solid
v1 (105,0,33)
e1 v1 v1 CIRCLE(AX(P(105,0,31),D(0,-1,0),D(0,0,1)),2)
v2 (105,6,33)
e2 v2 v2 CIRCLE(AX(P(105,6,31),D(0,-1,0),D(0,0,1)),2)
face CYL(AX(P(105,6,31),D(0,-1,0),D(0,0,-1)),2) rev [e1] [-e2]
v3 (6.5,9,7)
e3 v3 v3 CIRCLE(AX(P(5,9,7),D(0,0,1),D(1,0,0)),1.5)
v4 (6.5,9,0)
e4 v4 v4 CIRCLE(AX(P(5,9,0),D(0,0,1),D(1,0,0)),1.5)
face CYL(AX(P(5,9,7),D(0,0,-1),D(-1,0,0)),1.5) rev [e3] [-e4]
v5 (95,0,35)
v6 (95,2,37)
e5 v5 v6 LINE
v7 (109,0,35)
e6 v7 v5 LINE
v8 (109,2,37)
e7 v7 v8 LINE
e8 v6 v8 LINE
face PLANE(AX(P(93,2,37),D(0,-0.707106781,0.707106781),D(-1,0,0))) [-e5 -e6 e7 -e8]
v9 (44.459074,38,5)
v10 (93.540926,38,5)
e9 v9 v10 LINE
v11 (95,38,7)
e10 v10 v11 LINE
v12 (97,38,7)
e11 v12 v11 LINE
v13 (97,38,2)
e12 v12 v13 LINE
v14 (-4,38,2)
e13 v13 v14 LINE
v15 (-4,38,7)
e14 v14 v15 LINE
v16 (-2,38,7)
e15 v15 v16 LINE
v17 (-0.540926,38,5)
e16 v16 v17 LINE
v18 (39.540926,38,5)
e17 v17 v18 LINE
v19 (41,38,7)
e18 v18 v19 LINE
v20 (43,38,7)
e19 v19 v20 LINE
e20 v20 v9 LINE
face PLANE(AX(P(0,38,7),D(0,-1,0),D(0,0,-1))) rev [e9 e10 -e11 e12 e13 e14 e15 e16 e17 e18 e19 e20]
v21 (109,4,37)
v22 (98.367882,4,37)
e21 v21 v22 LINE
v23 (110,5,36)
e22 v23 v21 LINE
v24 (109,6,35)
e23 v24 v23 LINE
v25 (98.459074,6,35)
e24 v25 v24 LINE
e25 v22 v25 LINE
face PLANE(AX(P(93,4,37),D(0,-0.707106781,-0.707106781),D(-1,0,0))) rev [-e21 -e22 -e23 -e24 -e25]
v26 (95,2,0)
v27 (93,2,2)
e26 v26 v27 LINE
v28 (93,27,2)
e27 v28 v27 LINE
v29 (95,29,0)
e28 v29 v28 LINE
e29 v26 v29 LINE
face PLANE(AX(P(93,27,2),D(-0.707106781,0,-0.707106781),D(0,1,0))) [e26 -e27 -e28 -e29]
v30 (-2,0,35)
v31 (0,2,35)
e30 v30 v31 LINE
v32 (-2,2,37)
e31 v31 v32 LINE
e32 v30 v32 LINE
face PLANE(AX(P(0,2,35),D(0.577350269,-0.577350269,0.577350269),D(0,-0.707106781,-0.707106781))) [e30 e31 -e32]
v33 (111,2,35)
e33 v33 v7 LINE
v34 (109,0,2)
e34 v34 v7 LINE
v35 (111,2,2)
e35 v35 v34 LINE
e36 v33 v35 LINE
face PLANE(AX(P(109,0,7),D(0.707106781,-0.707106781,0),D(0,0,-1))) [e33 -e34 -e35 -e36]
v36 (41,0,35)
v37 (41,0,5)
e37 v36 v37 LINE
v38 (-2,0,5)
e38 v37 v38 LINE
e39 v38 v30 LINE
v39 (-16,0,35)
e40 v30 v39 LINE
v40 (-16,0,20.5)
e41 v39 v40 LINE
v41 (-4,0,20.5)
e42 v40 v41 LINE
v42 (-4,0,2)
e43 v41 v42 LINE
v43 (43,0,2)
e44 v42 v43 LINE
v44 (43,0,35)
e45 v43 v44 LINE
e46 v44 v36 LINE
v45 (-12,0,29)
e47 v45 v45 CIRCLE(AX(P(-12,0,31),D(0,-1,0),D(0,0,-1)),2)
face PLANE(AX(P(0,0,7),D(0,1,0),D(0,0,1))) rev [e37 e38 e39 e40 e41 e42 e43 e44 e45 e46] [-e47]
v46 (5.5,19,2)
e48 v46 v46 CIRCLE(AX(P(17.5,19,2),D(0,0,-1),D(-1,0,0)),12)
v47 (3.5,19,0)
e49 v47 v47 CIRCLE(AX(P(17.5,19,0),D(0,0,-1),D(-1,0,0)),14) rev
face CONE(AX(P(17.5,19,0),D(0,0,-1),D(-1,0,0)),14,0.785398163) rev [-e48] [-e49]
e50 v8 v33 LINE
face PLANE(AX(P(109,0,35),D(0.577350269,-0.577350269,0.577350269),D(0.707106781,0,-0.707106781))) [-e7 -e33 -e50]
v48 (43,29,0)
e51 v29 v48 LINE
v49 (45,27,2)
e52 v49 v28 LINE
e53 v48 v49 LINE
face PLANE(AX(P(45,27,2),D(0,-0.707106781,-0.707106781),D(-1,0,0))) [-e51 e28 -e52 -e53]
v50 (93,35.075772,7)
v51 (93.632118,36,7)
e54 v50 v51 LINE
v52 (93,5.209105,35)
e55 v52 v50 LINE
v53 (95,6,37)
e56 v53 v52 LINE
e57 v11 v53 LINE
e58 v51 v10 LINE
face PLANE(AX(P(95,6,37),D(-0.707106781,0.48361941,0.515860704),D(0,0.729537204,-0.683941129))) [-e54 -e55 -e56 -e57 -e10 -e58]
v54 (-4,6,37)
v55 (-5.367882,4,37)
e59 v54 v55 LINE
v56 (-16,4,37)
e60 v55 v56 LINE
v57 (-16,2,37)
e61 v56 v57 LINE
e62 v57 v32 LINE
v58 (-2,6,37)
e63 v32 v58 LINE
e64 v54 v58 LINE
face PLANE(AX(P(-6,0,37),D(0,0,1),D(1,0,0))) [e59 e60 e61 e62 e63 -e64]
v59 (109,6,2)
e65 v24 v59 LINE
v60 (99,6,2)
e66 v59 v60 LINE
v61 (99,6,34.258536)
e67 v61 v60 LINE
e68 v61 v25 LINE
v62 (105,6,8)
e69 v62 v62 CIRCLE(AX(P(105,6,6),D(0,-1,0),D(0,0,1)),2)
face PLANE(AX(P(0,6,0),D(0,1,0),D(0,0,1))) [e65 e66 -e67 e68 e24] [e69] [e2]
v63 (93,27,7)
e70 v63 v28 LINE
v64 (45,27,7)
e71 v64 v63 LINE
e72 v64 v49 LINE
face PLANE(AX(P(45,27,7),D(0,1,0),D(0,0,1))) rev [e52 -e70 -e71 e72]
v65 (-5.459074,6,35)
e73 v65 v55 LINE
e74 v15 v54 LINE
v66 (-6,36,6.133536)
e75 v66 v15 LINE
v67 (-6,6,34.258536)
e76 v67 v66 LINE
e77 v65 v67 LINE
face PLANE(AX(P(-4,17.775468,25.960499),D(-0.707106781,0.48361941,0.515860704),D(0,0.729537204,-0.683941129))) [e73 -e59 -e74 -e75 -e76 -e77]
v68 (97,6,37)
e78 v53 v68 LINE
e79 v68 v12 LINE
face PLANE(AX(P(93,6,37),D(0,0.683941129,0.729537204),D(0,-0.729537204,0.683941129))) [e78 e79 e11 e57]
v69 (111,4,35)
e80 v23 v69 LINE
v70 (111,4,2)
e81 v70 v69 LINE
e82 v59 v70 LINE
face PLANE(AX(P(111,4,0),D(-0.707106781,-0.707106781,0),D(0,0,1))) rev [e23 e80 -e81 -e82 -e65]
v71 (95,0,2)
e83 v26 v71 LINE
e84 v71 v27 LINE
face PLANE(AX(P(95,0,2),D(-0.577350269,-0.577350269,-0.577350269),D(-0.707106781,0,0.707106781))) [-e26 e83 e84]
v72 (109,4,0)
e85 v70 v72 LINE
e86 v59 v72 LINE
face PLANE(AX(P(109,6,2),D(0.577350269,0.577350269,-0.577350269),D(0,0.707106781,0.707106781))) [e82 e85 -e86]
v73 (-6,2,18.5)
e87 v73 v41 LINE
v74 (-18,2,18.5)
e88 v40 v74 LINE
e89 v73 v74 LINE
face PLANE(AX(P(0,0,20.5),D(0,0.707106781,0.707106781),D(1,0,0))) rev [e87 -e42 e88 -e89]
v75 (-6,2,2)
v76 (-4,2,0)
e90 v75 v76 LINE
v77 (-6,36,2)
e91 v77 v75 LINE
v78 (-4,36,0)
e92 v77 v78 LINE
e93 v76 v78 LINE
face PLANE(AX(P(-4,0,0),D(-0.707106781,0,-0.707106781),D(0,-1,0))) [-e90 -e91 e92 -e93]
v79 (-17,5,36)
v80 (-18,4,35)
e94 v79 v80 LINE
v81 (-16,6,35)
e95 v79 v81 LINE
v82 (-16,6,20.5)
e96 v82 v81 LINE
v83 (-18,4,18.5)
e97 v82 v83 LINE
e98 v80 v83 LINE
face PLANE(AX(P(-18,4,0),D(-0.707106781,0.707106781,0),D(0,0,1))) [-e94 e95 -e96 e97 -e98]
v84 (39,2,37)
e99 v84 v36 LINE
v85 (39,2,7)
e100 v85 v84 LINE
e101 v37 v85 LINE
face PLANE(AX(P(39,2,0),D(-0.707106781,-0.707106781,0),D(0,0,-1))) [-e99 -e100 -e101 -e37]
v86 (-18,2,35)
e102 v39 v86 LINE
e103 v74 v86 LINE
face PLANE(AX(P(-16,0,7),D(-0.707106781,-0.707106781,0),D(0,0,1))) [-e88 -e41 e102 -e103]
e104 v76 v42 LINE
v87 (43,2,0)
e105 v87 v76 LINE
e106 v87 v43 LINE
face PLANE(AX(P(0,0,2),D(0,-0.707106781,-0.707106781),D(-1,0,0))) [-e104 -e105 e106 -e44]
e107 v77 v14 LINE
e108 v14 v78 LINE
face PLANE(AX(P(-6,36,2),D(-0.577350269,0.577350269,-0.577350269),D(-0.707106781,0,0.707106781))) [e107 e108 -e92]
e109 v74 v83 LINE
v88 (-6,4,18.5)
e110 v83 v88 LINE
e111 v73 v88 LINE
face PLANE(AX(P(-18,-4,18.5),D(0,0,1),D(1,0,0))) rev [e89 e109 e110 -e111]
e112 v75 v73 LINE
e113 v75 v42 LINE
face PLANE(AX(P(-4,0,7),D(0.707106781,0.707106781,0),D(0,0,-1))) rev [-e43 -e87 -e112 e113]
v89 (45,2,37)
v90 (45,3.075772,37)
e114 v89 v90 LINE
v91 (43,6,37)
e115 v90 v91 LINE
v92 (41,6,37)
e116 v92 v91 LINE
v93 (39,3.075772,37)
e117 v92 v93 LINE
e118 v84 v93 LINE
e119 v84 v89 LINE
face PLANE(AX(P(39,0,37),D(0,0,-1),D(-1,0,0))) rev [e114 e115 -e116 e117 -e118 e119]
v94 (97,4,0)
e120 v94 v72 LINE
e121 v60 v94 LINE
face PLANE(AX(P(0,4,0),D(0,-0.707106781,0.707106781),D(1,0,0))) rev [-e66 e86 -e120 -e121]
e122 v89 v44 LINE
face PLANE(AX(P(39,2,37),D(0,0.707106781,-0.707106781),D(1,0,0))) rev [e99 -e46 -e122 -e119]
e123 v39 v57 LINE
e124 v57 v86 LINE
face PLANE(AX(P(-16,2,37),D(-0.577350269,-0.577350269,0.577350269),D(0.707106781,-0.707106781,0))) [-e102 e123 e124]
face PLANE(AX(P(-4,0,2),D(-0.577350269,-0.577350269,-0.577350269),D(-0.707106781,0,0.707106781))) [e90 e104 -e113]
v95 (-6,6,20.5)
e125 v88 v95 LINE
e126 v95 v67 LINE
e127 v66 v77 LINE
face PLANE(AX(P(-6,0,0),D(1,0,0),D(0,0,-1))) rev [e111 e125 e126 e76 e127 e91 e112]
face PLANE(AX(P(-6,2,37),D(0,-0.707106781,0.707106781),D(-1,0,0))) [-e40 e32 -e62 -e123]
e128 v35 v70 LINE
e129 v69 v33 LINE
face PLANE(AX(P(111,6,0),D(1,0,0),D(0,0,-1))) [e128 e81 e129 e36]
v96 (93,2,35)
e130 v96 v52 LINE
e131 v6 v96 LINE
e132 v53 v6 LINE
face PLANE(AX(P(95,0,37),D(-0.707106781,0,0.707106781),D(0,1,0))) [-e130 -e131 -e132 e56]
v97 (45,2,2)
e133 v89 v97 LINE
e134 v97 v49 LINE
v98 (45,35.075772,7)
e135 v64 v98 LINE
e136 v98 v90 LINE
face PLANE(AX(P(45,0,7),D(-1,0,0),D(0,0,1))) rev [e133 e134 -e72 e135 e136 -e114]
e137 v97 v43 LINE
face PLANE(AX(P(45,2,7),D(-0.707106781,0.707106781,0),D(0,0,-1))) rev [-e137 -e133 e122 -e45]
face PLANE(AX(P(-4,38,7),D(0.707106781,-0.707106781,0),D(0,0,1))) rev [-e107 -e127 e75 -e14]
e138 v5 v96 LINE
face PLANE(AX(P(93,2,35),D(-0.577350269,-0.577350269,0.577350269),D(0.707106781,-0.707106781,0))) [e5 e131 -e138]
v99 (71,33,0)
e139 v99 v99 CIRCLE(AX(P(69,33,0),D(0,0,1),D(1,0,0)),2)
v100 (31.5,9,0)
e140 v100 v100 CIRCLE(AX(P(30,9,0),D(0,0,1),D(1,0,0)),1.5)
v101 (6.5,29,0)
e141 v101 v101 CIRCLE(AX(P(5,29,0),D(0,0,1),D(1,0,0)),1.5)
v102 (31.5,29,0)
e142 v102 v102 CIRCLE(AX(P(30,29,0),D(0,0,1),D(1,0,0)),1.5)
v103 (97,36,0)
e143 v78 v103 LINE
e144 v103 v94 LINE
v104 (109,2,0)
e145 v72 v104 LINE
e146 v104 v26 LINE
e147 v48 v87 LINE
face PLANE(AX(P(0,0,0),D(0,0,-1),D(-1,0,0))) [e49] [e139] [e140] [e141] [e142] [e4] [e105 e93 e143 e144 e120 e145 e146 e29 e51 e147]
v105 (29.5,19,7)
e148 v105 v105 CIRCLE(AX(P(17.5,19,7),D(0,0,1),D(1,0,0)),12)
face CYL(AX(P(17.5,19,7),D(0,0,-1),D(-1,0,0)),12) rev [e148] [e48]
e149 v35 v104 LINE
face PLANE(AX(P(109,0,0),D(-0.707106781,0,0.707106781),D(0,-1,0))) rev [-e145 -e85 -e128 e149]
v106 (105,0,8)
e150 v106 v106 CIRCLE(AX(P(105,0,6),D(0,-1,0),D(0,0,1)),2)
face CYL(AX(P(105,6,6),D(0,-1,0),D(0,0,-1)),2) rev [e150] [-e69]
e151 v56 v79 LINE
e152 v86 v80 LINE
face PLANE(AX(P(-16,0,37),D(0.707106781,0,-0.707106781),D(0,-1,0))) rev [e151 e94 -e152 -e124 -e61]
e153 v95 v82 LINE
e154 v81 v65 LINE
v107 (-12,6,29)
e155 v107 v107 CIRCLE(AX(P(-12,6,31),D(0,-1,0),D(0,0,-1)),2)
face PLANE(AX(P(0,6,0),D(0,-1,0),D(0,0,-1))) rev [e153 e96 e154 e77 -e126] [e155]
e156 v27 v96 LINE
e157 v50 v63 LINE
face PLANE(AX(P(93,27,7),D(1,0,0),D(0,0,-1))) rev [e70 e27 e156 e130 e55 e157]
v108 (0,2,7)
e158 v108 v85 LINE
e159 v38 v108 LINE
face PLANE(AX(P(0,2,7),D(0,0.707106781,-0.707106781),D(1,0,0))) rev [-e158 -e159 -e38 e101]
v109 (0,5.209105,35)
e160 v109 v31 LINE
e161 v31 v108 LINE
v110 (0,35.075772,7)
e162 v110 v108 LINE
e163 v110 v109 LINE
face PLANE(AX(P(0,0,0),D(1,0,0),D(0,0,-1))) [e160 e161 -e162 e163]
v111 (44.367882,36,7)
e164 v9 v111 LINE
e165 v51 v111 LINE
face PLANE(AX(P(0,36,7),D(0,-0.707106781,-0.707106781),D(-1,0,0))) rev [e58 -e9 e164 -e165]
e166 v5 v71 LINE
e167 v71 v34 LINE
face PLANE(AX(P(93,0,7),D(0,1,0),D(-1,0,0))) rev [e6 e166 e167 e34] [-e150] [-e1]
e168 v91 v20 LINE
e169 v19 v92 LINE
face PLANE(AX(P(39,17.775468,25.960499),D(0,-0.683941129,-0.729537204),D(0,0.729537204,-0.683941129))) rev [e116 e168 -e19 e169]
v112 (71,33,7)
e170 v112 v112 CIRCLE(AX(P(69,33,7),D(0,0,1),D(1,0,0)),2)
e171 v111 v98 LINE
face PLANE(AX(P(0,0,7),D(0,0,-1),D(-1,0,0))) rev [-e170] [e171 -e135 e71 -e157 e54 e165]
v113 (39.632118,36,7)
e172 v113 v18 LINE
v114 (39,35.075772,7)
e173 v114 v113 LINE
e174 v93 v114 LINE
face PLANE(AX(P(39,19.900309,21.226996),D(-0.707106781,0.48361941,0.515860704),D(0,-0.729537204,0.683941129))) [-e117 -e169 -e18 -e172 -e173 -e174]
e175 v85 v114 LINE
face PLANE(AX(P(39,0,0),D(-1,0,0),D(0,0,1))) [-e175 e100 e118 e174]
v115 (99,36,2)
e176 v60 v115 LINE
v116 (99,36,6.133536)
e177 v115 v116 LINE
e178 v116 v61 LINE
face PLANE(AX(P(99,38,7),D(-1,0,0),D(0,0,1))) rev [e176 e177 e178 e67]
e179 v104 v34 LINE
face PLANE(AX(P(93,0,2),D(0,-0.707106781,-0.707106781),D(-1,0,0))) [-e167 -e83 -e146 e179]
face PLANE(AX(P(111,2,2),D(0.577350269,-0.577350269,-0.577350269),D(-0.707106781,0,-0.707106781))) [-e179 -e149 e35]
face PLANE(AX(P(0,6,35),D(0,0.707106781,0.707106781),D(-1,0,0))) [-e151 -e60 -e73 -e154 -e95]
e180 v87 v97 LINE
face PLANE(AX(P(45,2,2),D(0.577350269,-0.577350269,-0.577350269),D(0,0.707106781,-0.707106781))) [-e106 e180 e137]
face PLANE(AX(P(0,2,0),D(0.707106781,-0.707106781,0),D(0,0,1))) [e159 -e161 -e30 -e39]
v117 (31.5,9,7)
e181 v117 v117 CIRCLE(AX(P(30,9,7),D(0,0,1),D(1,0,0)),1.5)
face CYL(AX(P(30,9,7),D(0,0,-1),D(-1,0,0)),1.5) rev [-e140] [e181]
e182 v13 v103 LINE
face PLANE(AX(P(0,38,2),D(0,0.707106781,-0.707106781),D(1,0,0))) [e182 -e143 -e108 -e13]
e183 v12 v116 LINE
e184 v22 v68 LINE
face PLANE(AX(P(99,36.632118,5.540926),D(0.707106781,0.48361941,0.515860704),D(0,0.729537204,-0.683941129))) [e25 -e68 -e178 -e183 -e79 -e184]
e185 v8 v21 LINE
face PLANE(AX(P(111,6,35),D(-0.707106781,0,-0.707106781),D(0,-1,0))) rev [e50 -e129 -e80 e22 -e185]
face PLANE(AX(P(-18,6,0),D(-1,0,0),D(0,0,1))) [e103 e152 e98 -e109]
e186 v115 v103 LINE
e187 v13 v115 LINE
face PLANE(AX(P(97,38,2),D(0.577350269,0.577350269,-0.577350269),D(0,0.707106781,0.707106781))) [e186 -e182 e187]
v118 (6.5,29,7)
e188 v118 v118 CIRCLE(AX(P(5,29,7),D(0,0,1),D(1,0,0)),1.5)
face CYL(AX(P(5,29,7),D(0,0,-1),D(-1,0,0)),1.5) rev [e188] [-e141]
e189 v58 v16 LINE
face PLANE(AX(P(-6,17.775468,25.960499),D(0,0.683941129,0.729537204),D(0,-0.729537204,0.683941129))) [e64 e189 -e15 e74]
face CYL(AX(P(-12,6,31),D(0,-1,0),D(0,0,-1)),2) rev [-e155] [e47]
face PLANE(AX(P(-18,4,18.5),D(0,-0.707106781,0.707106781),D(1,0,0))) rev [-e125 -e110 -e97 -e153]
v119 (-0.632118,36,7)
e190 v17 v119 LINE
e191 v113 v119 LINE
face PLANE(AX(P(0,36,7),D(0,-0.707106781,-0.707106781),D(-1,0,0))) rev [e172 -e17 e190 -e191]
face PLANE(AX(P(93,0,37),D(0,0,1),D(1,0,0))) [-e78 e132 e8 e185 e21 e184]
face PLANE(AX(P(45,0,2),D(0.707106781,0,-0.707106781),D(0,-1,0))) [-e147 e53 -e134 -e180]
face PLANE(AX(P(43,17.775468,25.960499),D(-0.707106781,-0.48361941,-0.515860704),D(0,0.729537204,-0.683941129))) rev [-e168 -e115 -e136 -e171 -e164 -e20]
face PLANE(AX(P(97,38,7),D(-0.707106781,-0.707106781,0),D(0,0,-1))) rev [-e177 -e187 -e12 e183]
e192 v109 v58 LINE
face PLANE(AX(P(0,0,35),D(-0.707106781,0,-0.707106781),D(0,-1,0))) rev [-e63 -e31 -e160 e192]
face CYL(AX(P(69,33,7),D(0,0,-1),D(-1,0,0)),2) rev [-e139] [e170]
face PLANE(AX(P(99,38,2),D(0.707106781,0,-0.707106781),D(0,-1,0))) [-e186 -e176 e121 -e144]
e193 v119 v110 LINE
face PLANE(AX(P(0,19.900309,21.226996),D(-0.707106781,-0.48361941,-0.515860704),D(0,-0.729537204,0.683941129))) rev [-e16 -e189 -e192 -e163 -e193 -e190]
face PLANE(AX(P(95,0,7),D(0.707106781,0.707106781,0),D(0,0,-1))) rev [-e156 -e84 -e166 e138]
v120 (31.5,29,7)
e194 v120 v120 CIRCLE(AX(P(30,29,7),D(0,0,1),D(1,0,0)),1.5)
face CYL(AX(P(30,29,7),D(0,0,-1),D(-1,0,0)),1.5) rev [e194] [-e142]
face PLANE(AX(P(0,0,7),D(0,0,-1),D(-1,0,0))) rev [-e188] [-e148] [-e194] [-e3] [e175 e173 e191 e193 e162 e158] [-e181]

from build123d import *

# Parameters (mm, degrees)
SKETCH1_R           = 12
SKETCH1_R_2         = 1.5
SKETCH1_R_3         = 2
BOSS_EXTRUDE1_DEPTH = 7
BOSS_EXTRUDE2_DEPTH = 6
BOSS_EXTRUDE3_START = -99
BOSS_EXTRUDE3_DEPTH = 6
BOSS_EXTRUDE4_START = -54
BOSS_EXTRUDE4_DEPTH = 6
SKETCH3_W           = 12
SKETCH3_H           = 37
SKETCH3_R           = 2
BOSS_EXTRUDE5_DEPTH = 6
SKETCH4_W           = 12
SKETCH4_H           = 18.5
CUT_EXTRUDE1_DEPTH  = 10
CHAMFER1_SIZE       = 2
CHAMFER2_SIZE       = 2


with BuildPart() as part:
    # Sketch1 → Boss-Extrude1 (new body)
    with BuildSketch(Plane.XY):
        Polygon((0, 0), (45, 0), (45, 27), (93, 27), (93, 0), (99, 0), (99, 38), (0, 38), align=None)
        with Locations((17.5, 19)):
            Circle(SKETCH1_R, mode=Mode.SUBTRACT)
        with Locations((5, 29)):
            Circle(SKETCH1_R_2, mode=Mode.SUBTRACT)
        with Locations((5, 9)):
            Circle(SKETCH1_R_2, mode=Mode.SUBTRACT)
        with Locations((30, 9)):
            Circle(SKETCH1_R_2, mode=Mode.SUBTRACT)
        with Locations((30, 29)):
            Circle(SKETCH1_R_2, mode=Mode.SUBTRACT)
        with Locations((69, 33)):
            Circle(SKETCH1_R_3, mode=Mode.SUBTRACT)
    extrude(amount=BOSS_EXTRUDE1_DEPTH)

    # Sketch2 → Boss-Extrude2 (add)
    with BuildSketch(Plane(origin=(99, 0, 0), x_dir=(0, 0, -1), z_dir=(1, 0, 0))):
        Polygon((-37, 0), (-7, 0), (0, 0), (0, 38), (-7, 38), (-37, 6), align=None)
    extrude(amount=-BOSS_EXTRUDE2_DEPTH)

    # Sketch2<3> → Boss-Extrude3 (add)
    with BuildSketch(Plane(origin=(99, 0, 0), x_dir=(0, 0, -1), z_dir=(1, 0, 0)).offset(BOSS_EXTRUDE3_START)):
        Polygon((-37, 0), (-7, 0), (0, 0), (0, 38), (-7, 38), (-37, 6), align=None)
    extrude(amount=-BOSS_EXTRUDE3_DEPTH)

    # Sketch2<4> → Boss-Extrude4 (add)
    with BuildSketch(Plane(origin=(99, 0, 0), x_dir=(0, 0, -1), z_dir=(1, 0, 0)).offset(BOSS_EXTRUDE4_START)):
        Polygon((-37, 0), (-7, 0), (0, 0), (0, 38), (-7, 38), (-37, 6), align=None)
    extrude(amount=-BOSS_EXTRUDE4_DEPTH)

    # Sketch3 → Boss-Extrude5 (add)
    # profile 1 of 2: a face of its own
    with BuildSketch(Plane(origin=(0, 0, 0), x_dir=(-1, 0, 0), z_dir=(0, -1, 0))):
        with Locations((12, -18.5)):
            Rectangle(SKETCH3_W, SKETCH3_H)
        with Locations(Location((12, -31, 0), (0, 0, 90))):
            Circle(SKETCH3_R, mode=Mode.SUBTRACT)
        with Locations(Location((12, -6, 0), (0, 0, 90))):
            Circle(SKETCH3_R, mode=Mode.SUBTRACT)
    # profile 2 of 2: a face of its own
    with BuildSketch(Plane(origin=(0, 0, 0), x_dir=(-1, 0, 0), z_dir=(0, -1, 0))):
        with Locations((-105, -18.5)):
            Rectangle(SKETCH3_W, SKETCH3_H)
        with Locations(Location((-105, -31, 0), (0, 0, 270))):
            Circle(SKETCH3_R, mode=Mode.SUBTRACT)
        with Locations(Location((-105, -6, 0), (0, 0, 270))):
            Circle(SKETCH3_R, mode=Mode.SUBTRACT)
    extrude(amount=-BOSS_EXTRUDE5_DEPTH)

    # Sketch4 → Cut-Extrude1 (cut)
    with BuildSketch(Plane(origin=(0, 6, 0), x_dir=(1, 0, 0), z_dir=(0, 1, 0))):
        with Locations((-12, -9.25)):
            Rectangle(SKETCH4_W, SKETCH4_H)
    extrude(amount=-CUT_EXTRUDE1_DEPTH, mode=Mode.SUBTRACT)

    # Chamfer1
    chamfer1_edges = [part.edges().sort_by_distance(p)[0] for p in [
        (5.5, 19, 0),
        (69, 38, 7),
        (19.5, 38, 7),
        (111, 0, 18.5),
        (111, 6, 18.5),
        (19.5, 0, 7),
        (0, 0, 22),
        (93, 0, 18.5),
        (93, 3, 37),
        (102, 0, 37),
        (0, 3, 37),
        (39, 0, 22),
        (42, 0, 37),
        (45, 0, 18.5),
        (-9, 0, 37),
        (-18, 3, 37),
        (-18, 0, 27.75),
        (-18, 6, 27.75),
        (19.5, 0, 0),
        (45, 13.5, 0),
        (69, 27, 0),
        (93, 13.5, 0),
        (102, 0, 0),
        (111, 3, 37),
        (111, 3, 0),
        (105, 6, 0),
        (99, 22, 22),
        (99, 38, 3.5),
        (-6, 22, 22),
        (-6, 38, 3.5),
        (-6, 19, 0),
        (99, 22, 0),
        (46.5, 38, 0),
        (-12, 0, 18.5),
        (-12, 6, 18.5),
        (-6, 0, 9.25),
    ]]
    chamfer(chamfer1_edges, length=CHAMFER1_SIZE)

    # Chamfer2
    # the kernel refuses this chamfer: 2 mm, written as the material it takes off along each edge
    with BuildSketch(Plane(origin=(97, 6, 37), x_dir=(0, 0.027495876610588235, -0.9996219169112968), z_dir=(1, 0, 0))) as chamfer2_piece_1_section:
        Polygon((CHAMFER2_SIZE * 0.999621916911, -CHAMFER2_SIZE * 0.0274958766106), (-CHAMFER2_SIZE * 0.0274958766106, -CHAMFER2_SIZE * 0.999621916911), (0, 0), align=None)
    chamfer2_piece_1 = extrude(amount=17.143365976, mode=Mode.PRIVATE)
    chamfer2_piece_1 = split(chamfer2_piece_1, bisect_by=Plane(origin=(100.7856843, 3.388099041, 34.25949849), z_dir=(0.7071067811865475, 0.4836194101643707, 0.5158607041753291)), keep=Keep.TOP, mode=Mode.PRIVATE)
    add(chamfer2_piece_1, mode=Mode.SUBTRACT)
    with BuildSketch(Plane(origin=(-4, 6, 37), x_dir=(-1.1675093231223383e-15, 0.027495876610589956, -0.9996219169112965), z_dir=(-1, 0, 0))) as chamfer2_piece_2_section:
        Polygon((CHAMFER2_SIZE * 0.999621916911, CHAMFER2_SIZE * 0.0274958766106), (-CHAMFER2_SIZE * 0.0274958766106, CHAMFER2_SIZE * 0.999621916911), (0, 0), align=None)
    chamfer2_piece_2 = extrude(amount=17.143365976, mode=Mode.PRIVATE)
    chamfer2_piece_2 = split(chamfer2_piece_2, bisect_by=Plane(origin=(-7.7856843, 3.388099041, 34.25949849), z_dir=(-0.7071067811865475, 0.4836194101643707, 0.5158607041753291)), keep=Keep.TOP, mode=Mode.PRIVATE)
    add(chamfer2_piece_2, mode=Mode.SUBTRACT)
    with BuildSketch(Plane(origin=(0, 41.752276834, 3.482240468), x_dir=(0.027495876610586428, -0.6836825423068311, -0.72926137846062), z_dir=(0, -0.7295372041400852, 0.6839411288813297))) as chamfer2_piece_3_section:
        Polygon((CHAMFER2_SIZE * 0.999621916911, -CHAMFER2_SIZE * 0.0274958766106), (-CHAMFER2_SIZE * 0.0274958766106, -CHAMFER2_SIZE * 0.999621916911), (0, 0), align=None)
    chamfer2_piece_3 = extrude(amount=51.225928058, mode=Mode.PRIVATE)
    chamfer2_piece_3 = split(chamfer2_piece_3, bisect_by=Plane(origin=(-0.581475565, 36.992815088, 6.007184912), z_dir=(0, 0.7071067811865476, 0.7071067811865476)), keep=Keep.TOP, mode=Mode.PRIVATE)
    add(chamfer2_piece_3, mode=Mode.SUBTRACT)
    with BuildSketch(Plane(origin=(0, 41.752276834, 3.482240468), x_dir=(0.027495876610586428, -0.6836825423068311, -0.72926137846062), z_dir=(0, -0.7295372041400852, 0.6839411288813297))) as chamfer2_piece_4_section:
        Polygon((CHAMFER2_SIZE * 0.999621916911, -CHAMFER2_SIZE * 0.0274958766106), (-CHAMFER2_SIZE * 0.0274958766106, -CHAMFER2_SIZE * 0.999621916911), (0, 0), align=None)
    chamfer2_piece_4 = extrude(amount=51.225928058, mode=Mode.PRIVATE)
    chamfer2_piece_4 = split(chamfer2_piece_4, bisect_by=Plane(origin=(-0.512278585, 16.479410692, 7), z_dir=(0, 0, 1)), keep=Keep.TOP, mode=Mode.PRIVATE)
    add(chamfer2_piece_4, mode=Mode.SUBTRACT)
    with BuildSketch(Plane(origin=(93, 41.752276834, 3.482240468), x_dir=(-0.027495876610589116, -0.683682542306831, -0.7292613784606198), z_dir=(0, -0.7295372041400852, 0.6839411288813297))) as chamfer2_piece_5_section:
        Polygon((CHAMFER2_SIZE * 0.999621916911, CHAMFER2_SIZE * 0.0274958766106), (-CHAMFER2_SIZE * 0.0274958766106, CHAMFER2_SIZE * 0.999621916911), (0, 0), align=None)
    chamfer2_piece_5 = extrude(amount=51.225928058, mode=Mode.PRIVATE)
    chamfer2_piece_5 = split(chamfer2_piece_5, bisect_by=Plane(origin=(93.581475565, 36.992815088, 6.007184912), z_dir=(0, 0.7071067811865476, 0.7071067811865476)), keep=Keep.TOP, mode=Mode.PRIVATE)
    add(chamfer2_piece_5, mode=Mode.SUBTRACT)
    with BuildSketch(Plane(origin=(93, 41.752276834, 3.482240468), x_dir=(-0.027495876610589116, -0.683682542306831, -0.7292613784606198), z_dir=(0, -0.7295372041400852, 0.6839411288813297))) as chamfer2_piece_6_section:
        Polygon((CHAMFER2_SIZE * 0.999621916911, CHAMFER2_SIZE * 0.0274958766106), (-CHAMFER2_SIZE * 0.0274958766106, CHAMFER2_SIZE * 0.999621916911), (0, 0), align=None)
    chamfer2_piece_6 = extrude(amount=51.225928058, mode=Mode.PRIVATE)
    chamfer2_piece_6 = split(chamfer2_piece_6, bisect_by=Plane(origin=(93.512278585, 16.479410692, 7), z_dir=(0, 0, 1)), keep=Keep.TOP, mode=Mode.PRIVATE)
    add(chamfer2_piece_6, mode=Mode.SUBTRACT)
    with BuildSketch(Plane(origin=(39, 41.752276834, 3.482240468), x_dir=(0.9996219169112968, 0.01880556088862619, 0.020059264947867937), z_dir=(0, -0.7295372041400852, 0.6839411288813297))) as chamfer2_piece_7_section:
        Polygon((CHAMFER2_SIZE * 0.999621916911, -CHAMFER2_SIZE * 0.0274958766106), (-CHAMFER2_SIZE * 0.0274958766106, -CHAMFER2_SIZE * 0.999621916911), (0, 0), align=None)
    chamfer2_piece_7 = extrude(amount=54.150156351, mode=Mode.PRIVATE)
    chamfer2_piece_7 = split(chamfer2_piece_7, bisect_by=Plane(origin=(39.581475565, 36.992815088, 6.007184912), z_dir=(0, 0.7071067811865476, 0.7071067811865476)), keep=Keep.TOP, mode=Mode.PRIVATE)
    add(chamfer2_piece_7, mode=Mode.SUBTRACT)
    with BuildSketch(Plane(origin=(39, 41.752276834, 3.482240468), x_dir=(0.9996219169112968, 0.01880556088862619, 0.020059264947867937), z_dir=(0, -0.7295372041400852, 0.6839411288813297))) as chamfer2_piece_8_section:
        Polygon((CHAMFER2_SIZE * 0.999621916911, -CHAMFER2_SIZE * 0.0274958766106), (-CHAMFER2_SIZE * 0.0274958766106, -CHAMFER2_SIZE * 0.999621916911), (0, 0), align=None)
    chamfer2_piece_8 = extrude(amount=54.150156351, mode=Mode.PRIVATE)
    chamfer2_piece_8 = split(chamfer2_piece_8, bisect_by=Plane(origin=(39.51114873, 15.48496609, 7), z_dir=(0, 0, 1)), keep=Keep.TOP, mode=Mode.PRIVATE)
    add(chamfer2_piece_8, mode=Mode.SUBTRACT)
    with BuildSketch(Plane(origin=(45, 41.752276834, 3.482240468), x_dir=(0.027495876610585664, -0.6836825423068311, -0.7292613784606199), z_dir=(0, -0.7295372041400852, 0.6839411288813297))) as chamfer2_piece_9_section:
        Polygon((CHAMFER2_SIZE * 0.999621916911, -CHAMFER2_SIZE * 0.0274958766106), (-CHAMFER2_SIZE * 0.0274958766106, -CHAMFER2_SIZE * 0.999621916911), (0, 0), align=None)
    chamfer2_piece_9 = extrude(amount=54.150156351, mode=Mode.PRIVATE)
    chamfer2_piece_9 = split(chamfer2_piece_9, bisect_by=Plane(origin=(44.418524435, 36.992815088, 6.007184912), z_dir=(0, 0.7071067811865476, 0.7071067811865476)), keep=Keep.TOP, mode=Mode.PRIVATE)
    add(chamfer2_piece_9, mode=Mode.SUBTRACT)
    with BuildSketch(Plane(origin=(45, 41.752276834, 3.482240468), x_dir=(0.027495876610585664, -0.6836825423068311, -0.7292613784606199), z_dir=(0, -0.7295372041400852, 0.6839411288813297))) as chamfer2_piece_10_section:
        Polygon((CHAMFER2_SIZE * 0.999621916911, -CHAMFER2_SIZE * 0.0274958766106), (-CHAMFER2_SIZE * 0.0274958766106, -CHAMFER2_SIZE * 0.999621916911), (0, 0), align=None)
    chamfer2_piece_10 = extrude(amount=54.150156351, mode=Mode.PRIVATE)
    chamfer2_piece_10 = split(chamfer2_piece_10, bisect_by=Plane(origin=(44.48885127, 15.48496609, 7), z_dir=(0, 0, 1)), keep=Keep.TOP, mode=Mode.PRIVATE)
    add(chamfer2_piece_10, mode=Mode.SUBTRACT)


solid = part.part
